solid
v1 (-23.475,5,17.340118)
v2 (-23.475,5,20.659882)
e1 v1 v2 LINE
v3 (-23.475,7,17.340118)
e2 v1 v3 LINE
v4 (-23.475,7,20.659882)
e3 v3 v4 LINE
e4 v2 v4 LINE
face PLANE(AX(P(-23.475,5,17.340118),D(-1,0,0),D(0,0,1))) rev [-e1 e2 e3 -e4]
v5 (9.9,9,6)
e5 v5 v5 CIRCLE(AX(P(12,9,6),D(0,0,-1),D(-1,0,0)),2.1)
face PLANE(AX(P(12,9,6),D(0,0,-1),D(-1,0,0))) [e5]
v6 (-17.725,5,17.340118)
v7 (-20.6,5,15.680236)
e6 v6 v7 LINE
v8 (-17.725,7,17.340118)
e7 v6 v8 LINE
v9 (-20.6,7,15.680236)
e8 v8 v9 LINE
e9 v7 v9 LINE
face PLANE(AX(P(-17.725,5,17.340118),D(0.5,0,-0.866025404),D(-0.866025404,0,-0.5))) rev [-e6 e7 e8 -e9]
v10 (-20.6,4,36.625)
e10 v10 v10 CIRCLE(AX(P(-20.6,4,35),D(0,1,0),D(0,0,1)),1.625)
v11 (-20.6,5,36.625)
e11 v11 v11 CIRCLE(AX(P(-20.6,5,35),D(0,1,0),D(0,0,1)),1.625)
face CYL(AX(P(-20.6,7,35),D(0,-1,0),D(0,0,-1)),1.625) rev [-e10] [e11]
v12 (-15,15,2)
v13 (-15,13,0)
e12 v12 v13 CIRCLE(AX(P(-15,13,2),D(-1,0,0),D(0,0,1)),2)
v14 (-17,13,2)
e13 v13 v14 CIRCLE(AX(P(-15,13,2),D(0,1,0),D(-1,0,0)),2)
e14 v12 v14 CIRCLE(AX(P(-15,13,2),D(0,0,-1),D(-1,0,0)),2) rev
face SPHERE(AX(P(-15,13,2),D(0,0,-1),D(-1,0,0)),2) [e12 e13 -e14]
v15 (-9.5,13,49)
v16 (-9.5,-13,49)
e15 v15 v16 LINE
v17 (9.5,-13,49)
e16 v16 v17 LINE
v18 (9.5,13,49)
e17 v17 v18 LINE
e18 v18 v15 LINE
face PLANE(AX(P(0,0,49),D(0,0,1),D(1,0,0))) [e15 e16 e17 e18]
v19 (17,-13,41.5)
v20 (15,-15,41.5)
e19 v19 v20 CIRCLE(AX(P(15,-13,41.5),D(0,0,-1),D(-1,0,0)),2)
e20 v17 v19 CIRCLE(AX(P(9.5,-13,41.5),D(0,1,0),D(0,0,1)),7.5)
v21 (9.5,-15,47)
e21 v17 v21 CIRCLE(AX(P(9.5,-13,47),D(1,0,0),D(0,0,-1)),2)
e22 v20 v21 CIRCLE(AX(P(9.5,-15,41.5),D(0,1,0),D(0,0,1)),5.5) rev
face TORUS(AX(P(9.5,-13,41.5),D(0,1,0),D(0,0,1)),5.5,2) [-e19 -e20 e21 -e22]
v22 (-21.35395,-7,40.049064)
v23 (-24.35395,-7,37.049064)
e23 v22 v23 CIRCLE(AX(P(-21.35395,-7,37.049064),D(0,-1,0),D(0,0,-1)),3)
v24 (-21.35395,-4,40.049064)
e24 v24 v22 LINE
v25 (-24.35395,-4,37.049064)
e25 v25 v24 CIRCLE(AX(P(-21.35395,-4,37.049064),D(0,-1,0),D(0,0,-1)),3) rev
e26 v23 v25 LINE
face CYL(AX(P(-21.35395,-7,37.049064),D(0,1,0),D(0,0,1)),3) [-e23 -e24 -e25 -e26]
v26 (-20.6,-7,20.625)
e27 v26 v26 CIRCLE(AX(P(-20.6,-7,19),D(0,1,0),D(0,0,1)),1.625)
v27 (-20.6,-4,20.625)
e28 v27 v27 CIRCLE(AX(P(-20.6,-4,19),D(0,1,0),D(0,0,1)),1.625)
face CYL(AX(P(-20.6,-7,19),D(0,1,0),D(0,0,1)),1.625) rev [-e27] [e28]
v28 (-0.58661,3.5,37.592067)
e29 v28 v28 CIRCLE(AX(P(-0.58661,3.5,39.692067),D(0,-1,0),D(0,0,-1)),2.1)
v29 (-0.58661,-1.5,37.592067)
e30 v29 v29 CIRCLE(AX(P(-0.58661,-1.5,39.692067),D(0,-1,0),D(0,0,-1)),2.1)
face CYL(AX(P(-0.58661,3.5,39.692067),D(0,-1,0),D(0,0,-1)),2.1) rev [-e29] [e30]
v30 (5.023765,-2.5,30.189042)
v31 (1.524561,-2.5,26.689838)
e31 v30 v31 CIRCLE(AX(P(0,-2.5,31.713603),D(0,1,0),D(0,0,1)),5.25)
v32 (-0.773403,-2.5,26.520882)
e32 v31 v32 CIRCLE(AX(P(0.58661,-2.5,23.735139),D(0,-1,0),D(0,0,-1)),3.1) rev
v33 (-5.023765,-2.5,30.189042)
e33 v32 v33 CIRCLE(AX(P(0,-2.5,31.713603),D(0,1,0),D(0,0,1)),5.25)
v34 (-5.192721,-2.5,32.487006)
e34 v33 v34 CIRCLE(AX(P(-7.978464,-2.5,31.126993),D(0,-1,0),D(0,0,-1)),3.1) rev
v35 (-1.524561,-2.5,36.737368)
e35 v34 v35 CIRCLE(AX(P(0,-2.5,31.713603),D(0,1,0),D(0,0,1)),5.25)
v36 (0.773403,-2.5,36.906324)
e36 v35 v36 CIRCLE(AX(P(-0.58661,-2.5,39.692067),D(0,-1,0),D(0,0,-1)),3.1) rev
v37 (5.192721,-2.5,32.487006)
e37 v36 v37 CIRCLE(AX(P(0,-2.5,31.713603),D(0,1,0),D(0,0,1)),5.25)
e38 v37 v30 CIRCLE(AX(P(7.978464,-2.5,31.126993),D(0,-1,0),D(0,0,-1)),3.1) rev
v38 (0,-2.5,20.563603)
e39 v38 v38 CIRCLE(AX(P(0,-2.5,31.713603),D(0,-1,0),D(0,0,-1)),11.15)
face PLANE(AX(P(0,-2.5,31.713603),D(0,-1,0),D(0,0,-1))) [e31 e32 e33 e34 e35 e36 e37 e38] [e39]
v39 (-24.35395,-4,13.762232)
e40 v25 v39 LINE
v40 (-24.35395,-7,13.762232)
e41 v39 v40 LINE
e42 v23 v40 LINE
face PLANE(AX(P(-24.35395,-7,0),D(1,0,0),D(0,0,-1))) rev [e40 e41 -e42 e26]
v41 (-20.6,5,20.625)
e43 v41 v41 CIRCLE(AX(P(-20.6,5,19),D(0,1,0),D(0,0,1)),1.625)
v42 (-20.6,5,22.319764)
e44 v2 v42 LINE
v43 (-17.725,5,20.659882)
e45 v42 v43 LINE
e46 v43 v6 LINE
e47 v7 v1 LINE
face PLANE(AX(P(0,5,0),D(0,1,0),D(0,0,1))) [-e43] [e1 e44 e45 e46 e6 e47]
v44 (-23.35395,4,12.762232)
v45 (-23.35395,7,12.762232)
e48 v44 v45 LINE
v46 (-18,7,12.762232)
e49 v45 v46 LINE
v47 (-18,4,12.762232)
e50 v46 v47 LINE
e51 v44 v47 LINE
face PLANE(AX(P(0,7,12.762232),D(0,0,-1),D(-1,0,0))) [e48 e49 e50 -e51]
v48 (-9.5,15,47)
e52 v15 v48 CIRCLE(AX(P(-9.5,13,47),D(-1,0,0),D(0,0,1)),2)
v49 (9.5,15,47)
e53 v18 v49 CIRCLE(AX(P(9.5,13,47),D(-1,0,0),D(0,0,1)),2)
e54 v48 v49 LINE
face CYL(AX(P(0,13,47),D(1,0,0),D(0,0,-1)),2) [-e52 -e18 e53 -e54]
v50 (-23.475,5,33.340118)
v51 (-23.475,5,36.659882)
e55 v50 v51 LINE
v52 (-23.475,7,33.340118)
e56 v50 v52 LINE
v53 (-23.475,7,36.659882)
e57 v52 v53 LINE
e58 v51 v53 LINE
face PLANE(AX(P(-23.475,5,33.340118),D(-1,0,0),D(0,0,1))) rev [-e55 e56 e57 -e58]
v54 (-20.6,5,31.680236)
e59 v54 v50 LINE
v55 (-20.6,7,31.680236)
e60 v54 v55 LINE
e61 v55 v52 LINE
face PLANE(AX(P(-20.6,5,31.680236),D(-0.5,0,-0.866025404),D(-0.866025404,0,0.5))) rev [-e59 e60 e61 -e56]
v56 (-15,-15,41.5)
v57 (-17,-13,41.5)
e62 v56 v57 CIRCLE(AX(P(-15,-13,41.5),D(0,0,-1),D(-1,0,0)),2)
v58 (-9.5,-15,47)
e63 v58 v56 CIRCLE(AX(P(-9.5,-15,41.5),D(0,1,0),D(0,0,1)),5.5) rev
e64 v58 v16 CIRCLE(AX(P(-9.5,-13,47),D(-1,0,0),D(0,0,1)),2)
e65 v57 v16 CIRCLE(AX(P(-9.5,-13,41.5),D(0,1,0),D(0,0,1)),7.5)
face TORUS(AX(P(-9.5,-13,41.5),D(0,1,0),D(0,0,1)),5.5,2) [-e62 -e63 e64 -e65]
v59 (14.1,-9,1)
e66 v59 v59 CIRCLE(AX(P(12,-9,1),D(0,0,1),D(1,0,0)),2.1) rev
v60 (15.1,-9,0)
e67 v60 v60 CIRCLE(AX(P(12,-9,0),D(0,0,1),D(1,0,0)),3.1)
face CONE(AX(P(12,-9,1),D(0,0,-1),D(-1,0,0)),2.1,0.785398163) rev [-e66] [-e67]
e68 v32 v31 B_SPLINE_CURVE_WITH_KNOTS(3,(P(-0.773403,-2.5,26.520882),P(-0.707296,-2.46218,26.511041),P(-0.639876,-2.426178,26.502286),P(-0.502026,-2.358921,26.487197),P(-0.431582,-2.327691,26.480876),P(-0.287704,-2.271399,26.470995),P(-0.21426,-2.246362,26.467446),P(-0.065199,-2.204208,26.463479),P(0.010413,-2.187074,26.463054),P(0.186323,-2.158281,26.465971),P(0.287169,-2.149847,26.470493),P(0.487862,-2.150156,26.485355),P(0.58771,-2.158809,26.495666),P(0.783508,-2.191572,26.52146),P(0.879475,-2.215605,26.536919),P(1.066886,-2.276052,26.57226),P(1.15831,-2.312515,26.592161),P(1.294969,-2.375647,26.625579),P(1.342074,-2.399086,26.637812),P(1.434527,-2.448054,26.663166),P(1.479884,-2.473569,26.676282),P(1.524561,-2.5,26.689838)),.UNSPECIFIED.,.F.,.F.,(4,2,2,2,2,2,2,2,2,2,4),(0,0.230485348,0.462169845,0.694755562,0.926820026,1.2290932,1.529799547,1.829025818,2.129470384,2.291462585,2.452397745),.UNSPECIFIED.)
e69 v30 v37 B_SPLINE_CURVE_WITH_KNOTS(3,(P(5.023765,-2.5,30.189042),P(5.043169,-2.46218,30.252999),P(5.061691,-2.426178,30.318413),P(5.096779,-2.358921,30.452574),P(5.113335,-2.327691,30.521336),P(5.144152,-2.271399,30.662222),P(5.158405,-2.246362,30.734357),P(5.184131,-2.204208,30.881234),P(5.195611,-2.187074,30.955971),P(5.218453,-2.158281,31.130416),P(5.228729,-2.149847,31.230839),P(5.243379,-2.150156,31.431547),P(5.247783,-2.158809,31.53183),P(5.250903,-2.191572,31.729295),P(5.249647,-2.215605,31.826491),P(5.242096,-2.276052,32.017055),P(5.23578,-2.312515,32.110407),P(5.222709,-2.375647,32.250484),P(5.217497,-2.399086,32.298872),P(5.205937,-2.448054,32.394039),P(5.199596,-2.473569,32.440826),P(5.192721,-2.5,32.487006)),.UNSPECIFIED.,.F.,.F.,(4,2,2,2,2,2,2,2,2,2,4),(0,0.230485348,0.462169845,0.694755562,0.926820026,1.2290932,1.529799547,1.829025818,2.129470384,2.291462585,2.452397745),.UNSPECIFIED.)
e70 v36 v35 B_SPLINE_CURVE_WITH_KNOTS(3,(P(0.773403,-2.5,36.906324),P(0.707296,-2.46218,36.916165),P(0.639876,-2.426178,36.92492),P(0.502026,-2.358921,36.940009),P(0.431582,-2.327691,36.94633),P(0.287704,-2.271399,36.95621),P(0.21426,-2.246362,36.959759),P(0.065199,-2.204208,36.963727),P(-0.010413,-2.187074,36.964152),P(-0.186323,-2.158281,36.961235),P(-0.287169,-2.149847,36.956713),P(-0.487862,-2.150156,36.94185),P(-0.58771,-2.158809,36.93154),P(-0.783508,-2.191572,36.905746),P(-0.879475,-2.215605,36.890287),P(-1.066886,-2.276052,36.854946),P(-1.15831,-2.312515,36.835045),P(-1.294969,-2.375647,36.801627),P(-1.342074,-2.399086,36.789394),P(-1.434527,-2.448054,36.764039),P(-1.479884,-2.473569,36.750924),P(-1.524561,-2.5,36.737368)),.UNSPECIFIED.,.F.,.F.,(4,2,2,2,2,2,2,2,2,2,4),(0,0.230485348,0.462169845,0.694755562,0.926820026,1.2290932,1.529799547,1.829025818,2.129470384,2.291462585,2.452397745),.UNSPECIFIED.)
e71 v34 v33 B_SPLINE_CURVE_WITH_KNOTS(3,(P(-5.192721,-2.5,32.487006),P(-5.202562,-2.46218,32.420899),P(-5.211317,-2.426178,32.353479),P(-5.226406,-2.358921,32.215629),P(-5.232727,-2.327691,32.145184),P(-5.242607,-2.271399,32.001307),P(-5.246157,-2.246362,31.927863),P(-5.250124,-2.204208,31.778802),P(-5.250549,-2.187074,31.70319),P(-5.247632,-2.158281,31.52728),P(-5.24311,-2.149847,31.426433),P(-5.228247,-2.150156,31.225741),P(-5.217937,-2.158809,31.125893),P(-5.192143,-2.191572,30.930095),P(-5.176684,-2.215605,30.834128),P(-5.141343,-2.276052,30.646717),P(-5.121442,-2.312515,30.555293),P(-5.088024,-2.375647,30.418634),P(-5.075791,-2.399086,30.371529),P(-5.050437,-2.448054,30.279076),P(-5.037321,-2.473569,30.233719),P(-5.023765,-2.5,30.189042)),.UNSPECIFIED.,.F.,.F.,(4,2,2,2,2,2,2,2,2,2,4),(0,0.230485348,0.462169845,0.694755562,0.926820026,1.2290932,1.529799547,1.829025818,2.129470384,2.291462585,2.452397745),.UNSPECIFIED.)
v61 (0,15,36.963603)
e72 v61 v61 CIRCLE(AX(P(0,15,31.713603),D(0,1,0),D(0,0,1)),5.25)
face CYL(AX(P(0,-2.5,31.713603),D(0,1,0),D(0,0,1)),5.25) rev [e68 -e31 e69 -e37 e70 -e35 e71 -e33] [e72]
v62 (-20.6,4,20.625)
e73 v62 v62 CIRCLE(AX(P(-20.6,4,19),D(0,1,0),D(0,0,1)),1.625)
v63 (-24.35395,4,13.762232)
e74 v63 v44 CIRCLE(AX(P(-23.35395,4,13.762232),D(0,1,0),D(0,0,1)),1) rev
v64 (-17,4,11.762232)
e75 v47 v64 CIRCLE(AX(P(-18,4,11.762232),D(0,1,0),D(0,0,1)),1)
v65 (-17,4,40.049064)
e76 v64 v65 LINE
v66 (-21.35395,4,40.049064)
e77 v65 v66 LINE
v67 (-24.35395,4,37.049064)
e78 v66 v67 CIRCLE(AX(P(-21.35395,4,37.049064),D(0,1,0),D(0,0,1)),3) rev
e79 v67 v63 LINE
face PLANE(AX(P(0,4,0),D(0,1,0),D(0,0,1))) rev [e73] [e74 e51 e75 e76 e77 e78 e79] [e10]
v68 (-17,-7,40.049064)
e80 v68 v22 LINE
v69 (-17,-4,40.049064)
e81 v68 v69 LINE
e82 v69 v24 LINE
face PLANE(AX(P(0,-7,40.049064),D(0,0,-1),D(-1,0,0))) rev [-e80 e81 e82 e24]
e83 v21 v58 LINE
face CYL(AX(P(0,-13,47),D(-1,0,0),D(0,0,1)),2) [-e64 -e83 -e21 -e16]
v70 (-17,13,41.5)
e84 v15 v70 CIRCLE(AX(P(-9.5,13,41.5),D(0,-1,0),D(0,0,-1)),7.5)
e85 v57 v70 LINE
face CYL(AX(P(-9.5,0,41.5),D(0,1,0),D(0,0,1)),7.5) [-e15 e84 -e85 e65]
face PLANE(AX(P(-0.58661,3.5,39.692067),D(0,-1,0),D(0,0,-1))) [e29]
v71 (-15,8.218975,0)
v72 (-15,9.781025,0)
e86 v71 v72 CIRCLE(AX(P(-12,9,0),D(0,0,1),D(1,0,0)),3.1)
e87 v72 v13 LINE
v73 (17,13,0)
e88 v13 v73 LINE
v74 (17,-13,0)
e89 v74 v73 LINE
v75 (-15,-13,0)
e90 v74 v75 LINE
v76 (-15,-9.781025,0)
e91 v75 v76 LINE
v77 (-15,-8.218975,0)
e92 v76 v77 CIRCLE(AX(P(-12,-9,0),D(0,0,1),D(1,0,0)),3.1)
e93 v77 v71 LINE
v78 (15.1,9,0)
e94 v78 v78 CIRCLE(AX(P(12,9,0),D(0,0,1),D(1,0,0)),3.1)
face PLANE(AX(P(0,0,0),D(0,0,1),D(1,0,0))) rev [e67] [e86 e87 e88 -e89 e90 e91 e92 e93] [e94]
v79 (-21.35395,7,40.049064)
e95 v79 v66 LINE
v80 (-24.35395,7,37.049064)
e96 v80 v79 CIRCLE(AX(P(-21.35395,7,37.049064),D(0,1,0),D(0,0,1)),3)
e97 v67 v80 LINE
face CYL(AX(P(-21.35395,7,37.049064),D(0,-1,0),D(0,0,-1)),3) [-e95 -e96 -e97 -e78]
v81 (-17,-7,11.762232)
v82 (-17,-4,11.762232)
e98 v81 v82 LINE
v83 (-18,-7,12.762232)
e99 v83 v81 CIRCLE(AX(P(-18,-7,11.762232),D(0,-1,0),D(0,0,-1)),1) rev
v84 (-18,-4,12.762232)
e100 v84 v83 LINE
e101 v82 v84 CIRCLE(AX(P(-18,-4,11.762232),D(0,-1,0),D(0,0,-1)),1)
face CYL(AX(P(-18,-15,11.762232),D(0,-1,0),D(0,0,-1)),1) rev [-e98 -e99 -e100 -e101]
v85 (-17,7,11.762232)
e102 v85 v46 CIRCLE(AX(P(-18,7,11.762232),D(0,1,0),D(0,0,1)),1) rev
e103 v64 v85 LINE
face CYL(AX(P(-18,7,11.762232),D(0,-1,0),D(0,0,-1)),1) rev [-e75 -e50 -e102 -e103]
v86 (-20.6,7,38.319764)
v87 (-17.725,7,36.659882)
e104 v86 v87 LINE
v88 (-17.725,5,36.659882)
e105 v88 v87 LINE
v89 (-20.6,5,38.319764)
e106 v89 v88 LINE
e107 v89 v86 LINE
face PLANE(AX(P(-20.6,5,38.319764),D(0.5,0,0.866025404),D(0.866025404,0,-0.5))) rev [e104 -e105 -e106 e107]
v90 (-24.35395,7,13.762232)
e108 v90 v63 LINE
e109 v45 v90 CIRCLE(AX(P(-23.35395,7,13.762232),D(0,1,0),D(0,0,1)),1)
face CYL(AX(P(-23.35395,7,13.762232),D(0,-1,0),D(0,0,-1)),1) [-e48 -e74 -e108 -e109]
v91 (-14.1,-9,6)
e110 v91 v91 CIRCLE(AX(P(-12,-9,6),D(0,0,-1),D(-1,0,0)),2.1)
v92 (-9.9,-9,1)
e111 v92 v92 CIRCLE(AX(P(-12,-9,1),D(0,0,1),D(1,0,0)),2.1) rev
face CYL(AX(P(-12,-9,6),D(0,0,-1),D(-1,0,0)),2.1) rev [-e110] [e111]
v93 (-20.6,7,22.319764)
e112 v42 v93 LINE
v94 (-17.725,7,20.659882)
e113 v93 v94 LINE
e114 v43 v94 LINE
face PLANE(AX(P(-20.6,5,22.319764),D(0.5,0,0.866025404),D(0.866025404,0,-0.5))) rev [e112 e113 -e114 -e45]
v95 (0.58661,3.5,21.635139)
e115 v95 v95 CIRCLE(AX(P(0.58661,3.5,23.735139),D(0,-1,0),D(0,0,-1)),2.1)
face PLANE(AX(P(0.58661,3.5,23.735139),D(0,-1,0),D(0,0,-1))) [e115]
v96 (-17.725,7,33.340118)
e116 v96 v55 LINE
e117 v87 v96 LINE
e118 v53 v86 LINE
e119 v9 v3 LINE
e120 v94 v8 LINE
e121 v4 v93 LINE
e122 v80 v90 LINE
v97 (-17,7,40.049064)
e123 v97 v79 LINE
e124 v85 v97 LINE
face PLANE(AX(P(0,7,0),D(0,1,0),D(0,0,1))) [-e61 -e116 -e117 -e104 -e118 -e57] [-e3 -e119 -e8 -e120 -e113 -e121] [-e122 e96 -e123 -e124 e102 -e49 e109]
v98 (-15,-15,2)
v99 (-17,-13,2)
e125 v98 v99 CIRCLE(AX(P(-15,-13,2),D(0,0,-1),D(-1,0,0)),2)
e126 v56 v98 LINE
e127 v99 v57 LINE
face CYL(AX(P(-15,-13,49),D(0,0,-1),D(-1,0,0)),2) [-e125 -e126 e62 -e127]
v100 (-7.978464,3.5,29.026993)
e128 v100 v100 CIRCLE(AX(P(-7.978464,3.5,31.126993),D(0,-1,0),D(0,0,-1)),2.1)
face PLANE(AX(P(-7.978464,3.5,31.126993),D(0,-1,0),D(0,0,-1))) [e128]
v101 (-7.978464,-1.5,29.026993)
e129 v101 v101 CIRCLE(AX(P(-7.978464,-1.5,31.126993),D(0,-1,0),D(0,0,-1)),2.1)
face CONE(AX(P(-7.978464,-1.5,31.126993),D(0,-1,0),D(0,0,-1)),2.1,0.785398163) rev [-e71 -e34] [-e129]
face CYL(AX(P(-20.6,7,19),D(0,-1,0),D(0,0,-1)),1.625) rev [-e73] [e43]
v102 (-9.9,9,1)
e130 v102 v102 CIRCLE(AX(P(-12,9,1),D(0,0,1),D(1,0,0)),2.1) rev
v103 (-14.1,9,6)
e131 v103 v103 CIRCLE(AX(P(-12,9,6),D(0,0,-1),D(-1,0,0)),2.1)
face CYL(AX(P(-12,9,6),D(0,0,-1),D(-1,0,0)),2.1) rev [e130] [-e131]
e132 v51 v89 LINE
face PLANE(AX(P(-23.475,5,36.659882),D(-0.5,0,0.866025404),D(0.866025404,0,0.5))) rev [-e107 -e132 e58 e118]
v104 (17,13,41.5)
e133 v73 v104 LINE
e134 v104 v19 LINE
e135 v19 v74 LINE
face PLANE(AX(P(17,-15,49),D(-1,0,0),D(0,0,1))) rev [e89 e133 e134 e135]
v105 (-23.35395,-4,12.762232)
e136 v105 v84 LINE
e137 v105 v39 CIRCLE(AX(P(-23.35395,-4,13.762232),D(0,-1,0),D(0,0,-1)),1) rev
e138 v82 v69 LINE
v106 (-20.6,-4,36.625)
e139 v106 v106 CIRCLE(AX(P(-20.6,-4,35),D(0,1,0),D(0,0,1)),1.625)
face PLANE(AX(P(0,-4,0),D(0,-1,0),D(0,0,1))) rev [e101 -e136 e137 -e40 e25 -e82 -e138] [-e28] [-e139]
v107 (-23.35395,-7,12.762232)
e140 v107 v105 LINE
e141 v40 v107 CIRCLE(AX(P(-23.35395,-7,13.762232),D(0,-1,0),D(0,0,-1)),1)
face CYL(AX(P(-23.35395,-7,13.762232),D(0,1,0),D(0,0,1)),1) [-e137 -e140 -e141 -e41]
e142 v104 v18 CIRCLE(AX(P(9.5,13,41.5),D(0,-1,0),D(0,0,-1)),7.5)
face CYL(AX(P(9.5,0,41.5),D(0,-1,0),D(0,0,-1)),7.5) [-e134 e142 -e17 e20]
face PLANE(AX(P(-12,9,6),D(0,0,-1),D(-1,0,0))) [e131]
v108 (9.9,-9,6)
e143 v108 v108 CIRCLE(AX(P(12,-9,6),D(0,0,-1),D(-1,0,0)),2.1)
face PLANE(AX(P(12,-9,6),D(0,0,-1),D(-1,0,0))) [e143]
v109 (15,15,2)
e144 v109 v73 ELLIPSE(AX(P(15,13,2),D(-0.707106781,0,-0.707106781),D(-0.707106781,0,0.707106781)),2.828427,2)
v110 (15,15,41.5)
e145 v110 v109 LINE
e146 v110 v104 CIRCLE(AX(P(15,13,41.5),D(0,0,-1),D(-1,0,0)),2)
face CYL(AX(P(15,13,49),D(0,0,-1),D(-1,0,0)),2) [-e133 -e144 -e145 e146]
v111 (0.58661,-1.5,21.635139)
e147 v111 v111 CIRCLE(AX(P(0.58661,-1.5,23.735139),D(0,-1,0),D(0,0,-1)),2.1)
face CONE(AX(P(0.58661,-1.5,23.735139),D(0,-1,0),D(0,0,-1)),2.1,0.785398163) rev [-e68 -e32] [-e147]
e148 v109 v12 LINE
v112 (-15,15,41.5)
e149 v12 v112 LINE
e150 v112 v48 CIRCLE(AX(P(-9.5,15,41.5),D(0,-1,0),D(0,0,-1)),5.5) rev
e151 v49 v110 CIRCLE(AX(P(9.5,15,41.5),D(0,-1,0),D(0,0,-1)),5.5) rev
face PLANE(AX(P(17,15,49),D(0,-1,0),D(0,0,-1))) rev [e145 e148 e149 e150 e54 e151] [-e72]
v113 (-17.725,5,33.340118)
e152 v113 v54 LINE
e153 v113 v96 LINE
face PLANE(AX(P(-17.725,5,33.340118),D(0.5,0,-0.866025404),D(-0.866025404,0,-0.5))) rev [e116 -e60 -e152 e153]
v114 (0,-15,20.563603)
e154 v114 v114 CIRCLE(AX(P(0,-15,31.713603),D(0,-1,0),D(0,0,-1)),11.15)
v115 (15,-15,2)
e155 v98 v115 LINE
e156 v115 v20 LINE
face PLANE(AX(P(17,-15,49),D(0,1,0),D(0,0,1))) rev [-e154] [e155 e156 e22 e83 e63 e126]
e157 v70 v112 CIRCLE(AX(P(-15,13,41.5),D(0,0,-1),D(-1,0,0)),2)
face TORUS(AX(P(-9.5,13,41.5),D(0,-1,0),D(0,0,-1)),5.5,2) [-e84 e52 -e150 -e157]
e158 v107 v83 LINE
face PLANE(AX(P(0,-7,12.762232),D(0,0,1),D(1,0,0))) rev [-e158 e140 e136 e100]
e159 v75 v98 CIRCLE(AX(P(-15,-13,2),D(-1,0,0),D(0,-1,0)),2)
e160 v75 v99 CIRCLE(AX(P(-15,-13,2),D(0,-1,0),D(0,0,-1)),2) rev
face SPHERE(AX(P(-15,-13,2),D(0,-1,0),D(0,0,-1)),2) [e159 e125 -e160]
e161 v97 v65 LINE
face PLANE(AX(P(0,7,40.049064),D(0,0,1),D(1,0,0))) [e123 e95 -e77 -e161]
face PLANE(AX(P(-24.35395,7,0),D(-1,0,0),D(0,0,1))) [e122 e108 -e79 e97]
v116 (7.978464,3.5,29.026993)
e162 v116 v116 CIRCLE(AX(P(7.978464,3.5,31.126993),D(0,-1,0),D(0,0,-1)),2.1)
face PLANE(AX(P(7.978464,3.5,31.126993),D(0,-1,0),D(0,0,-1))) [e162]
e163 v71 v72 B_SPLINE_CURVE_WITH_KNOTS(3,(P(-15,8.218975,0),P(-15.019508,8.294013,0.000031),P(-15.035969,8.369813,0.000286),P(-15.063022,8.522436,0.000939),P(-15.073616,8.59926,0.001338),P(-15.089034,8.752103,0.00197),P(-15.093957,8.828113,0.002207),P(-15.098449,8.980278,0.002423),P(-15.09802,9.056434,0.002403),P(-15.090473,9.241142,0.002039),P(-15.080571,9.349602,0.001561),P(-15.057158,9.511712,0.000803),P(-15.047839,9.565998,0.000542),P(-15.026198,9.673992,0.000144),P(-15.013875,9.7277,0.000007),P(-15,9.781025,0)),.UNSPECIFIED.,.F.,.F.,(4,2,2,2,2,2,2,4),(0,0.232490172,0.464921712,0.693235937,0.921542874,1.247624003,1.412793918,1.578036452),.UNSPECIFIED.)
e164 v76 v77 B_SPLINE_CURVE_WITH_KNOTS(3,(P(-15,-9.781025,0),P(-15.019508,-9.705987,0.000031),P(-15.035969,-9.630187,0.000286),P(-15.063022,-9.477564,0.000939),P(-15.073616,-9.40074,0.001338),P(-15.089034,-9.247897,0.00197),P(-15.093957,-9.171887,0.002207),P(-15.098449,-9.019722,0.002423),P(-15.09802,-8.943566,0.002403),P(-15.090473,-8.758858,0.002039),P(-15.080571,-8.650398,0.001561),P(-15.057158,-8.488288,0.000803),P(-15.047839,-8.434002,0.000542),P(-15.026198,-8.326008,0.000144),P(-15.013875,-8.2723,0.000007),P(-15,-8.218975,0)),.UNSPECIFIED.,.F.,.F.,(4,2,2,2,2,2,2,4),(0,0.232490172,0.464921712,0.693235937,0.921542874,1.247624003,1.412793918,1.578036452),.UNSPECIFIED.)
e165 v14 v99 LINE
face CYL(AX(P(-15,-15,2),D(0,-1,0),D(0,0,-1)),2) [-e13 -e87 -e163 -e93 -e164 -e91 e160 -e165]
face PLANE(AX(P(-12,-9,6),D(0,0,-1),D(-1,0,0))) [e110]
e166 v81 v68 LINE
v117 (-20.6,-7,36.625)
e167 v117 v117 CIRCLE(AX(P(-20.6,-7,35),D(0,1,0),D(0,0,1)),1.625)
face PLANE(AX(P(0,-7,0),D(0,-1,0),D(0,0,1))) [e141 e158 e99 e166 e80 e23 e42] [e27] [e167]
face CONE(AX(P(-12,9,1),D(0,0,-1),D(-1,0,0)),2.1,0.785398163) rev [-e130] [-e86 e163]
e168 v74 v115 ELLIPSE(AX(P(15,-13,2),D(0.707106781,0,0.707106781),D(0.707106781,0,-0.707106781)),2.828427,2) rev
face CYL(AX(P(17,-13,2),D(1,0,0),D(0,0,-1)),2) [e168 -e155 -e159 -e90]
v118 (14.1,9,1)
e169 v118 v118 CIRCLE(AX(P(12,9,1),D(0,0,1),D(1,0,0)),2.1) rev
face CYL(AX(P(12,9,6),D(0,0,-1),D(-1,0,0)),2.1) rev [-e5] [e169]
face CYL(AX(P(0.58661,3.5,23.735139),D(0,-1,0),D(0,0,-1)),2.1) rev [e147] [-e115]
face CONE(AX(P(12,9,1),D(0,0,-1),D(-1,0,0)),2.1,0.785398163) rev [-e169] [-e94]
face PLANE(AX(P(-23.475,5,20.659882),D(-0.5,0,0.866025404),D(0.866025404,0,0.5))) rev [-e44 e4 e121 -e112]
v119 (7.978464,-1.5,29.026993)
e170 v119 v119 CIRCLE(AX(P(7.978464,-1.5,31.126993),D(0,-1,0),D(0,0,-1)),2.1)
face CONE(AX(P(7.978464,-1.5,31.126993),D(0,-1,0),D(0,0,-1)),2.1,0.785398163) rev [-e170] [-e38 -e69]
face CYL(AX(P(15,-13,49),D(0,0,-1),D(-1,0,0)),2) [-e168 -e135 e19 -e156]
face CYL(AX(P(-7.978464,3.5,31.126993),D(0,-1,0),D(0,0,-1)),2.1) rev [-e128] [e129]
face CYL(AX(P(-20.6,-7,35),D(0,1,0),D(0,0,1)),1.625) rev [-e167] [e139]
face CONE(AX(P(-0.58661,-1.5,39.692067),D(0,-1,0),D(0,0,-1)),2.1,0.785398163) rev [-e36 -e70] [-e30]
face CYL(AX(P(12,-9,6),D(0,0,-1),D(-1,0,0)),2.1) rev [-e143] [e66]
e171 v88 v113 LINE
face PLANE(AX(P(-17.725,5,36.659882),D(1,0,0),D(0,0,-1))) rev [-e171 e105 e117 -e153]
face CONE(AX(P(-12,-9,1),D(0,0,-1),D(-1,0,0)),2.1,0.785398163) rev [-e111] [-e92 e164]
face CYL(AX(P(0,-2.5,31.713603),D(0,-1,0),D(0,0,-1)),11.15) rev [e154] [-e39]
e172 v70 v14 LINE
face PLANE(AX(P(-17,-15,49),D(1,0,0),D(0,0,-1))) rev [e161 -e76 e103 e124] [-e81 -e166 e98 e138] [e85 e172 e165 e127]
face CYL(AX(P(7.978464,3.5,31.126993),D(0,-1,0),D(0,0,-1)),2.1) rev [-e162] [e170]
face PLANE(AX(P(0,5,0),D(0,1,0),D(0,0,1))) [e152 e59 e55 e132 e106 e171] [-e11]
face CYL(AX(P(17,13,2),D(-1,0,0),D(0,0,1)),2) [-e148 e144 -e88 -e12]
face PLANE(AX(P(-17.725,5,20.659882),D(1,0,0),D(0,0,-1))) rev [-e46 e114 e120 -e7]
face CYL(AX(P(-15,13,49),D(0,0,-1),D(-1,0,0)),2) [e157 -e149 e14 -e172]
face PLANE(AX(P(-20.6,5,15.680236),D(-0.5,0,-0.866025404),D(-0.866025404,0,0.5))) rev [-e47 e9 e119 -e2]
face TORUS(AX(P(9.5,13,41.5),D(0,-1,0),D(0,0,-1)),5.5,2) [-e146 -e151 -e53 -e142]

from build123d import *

# Parameters (mm, degrees)
SKETCH1_W           = 34
SKETCH1_H           = 30
BOSS_EXTRUDE1_DEPTH = 49
SKETCH2_R           = 2.1
CUT_EXTRUDE1_DEPTH  = 6
SKETCH5_R           = 11.15
CUT_EXTRUDE2_DEPTH  = 12.5
SKETCH6_R           = 5.25
CUT_EXTRUDE3_DEPTH  = 17.5
SKETCH7_R           = 2.1
CUT_EXTRUDE4_DEPTH  = 6
CHAMFER1_SIZE       = 1
CHAMFER2_SIZE       = 1
FILLET1_R           = 7.5
FILLET2_R           = 2
BOSS_EXTRUDE2_START = 4
SKETCH9_W           = 7.353949633
SKETCH9_H           = 27.286831646
SKETCH9_R           = 1.625
BOSS_EXTRUDE2_DEPTH = 3
FILLET3_R           = 3
FILLET4_R           = 1
CUT_EXTRUDE6_DEPTH  = 2


with BuildPart() as part:
    # Sketch1 → Boss-Extrude1 (new body)
    with BuildSketch(Plane.XY):
        Rectangle(SKETCH1_W, SKETCH1_H)
    extrude(amount=BOSS_EXTRUDE1_DEPTH)

    # Sketch2 → Cut-Extrude1 (cut)
    with BuildSketch(Plane(origin=(0, 0, 0), x_dir=(-1, 0, 0), z_dir=(0, 0, -1))):
        with Locations((12, -9)):
            Circle(SKETCH2_R)
        with Locations((12, 9)):
            Circle(SKETCH2_R)
        with Locations((-12, -9)):
            Circle(SKETCH2_R)
        with Locations((-12, 9)):
            Circle(SKETCH2_R)
    extrude(amount=-CUT_EXTRUDE1_DEPTH, mode=Mode.SUBTRACT)

    # Sketch5 → Cut-Extrude2 (cut)
    with BuildSketch(Plane.XZ.offset(15)):
        with Locations(Location((0, 31.713602896, 0), (0, 0, 270))):
            Circle(SKETCH5_R)
    extrude(amount=-CUT_EXTRUDE2_DEPTH, mode=Mode.SUBTRACT)

    # Sketch6 → Cut-Extrude3 (cut)
    with BuildSketch(Plane(origin=(0, 15, 0), x_dir=(1, 0, 0), z_dir=(0, 1, 0))):
        with Locations(Location((0, -31.713602896, 0), (0, 0, 270))):
            Circle(SKETCH6_R)
    extrude(amount=-CUT_EXTRUDE3_DEPTH, mode=Mode.SUBTRACT)

    # Sketch7 → Cut-Extrude4 (cut)
    with BuildSketch(Plane.XZ.offset(2.5)):
        with Locations(Location((-7.978464084, 31.126993267, 0), (0, 0, 270))):
            Circle(SKETCH7_R)
        with Locations(Location((-0.586609629, 39.692066981, 0), (0, 0, 270))):
            Circle(SKETCH7_R)
        with Locations(Location((7.978464084, 31.126993267, 0), (0, 0, 270))):
            Circle(SKETCH7_R)
        with Locations(Location((0.586609629, 23.735138812, 0), (0, 0, 270))):
            Circle(SKETCH7_R)
    extrude(amount=-CUT_EXTRUDE4_DEPTH, mode=Mode.SUBTRACT)

    # Chamfer1
    # the kernel refuses this chamfer: 1 mm, written as the material it takes off along each edge
    with BuildSketch(Plane(origin=(-7.978464084, -2.5, 31.126993267), x_dir=(0, 0, -1), z_dir=(-1, 0, 0))) as chamfer1_piece_1:
        Polygon((2.1 + CHAMFER1_SIZE, 0), (2.1, -CHAMFER1_SIZE), (2.1, 0), align=None)
    revolve(axis=Axis((-7.978464084, -2.5, 31.126993267), (0, -1, 0)), mode=Mode.SUBTRACT)
    with BuildSketch(Plane(origin=(-0.586609629, -2.5, 39.692066981), x_dir=(0, 0, -1), z_dir=(-1, 0, 0))) as chamfer1_piece_2:
        Polygon((2.1 + CHAMFER1_SIZE, 0), (2.1, -CHAMFER1_SIZE), (2.1, 0), align=None)
    revolve(axis=Axis((-0.586609629, -2.5, 39.692066981), (0, -1, 0)), mode=Mode.SUBTRACT)
    with BuildSketch(Plane(origin=(7.978464084, -2.5, 31.126993267), x_dir=(0, 0, -1), z_dir=(-1, 0, 0))) as chamfer1_piece_3:
        Polygon((2.1 + CHAMFER1_SIZE, 0), (2.1, -CHAMFER1_SIZE), (2.1, 0), align=None)
    revolve(axis=Axis((7.978464084, -2.5, 31.126993267), (0, -1, 0)), mode=Mode.SUBTRACT)
    with BuildSketch(Plane(origin=(0.586609629, -2.5, 23.735138812), x_dir=(0, 0, -1), z_dir=(-1, 0, 0))) as chamfer1_piece_4:
        Polygon((2.1 + CHAMFER1_SIZE, 0), (2.1, -CHAMFER1_SIZE), (2.1, 0), align=None)
    revolve(axis=Axis((0.586609629, -2.5, 23.735138812), (0, -1, 0)), mode=Mode.SUBTRACT)

    # Chamfer2
    chamfer2_edges = [part.edges().sort_by_distance(p)[0] for p in [
        (-9.9, 9, 0),
        (14.1, -9, 0),
        (14.1, 9, 0),
        (-9.9, -9, 0),
    ]]
    chamfer(chamfer2_edges, length=CHAMFER2_SIZE)

    # Fillet1
    fillet1_edges = [part.edges().sort_by_distance(p)[0] for p in [
        (-17, 0, 49),
        (17, 0, 49),
    ]]
    fillet(fillet1_edges, radius=FILLET1_R)

    # Fillet2
    # the kernel refuses this fillet: 2 mm, written as the material it takes off along each edge
    with BuildSketch(Plane(origin=(-15, -13, 2), x_dir=(0, 0, -1), z_dir=(0, -1, 0))) as fillet2_piece_1_section:
        Polygon((0, 0), (FILLET2_R, 0), (FILLET2_R, -FILLET2_R), (0, -FILLET2_R), align=None)
    fillet2_piece_1 = extrude(amount=FILLET2_R, mode=Mode.PRIVATE)
    fillet2_piece_1 = fillet2_piece_1 - Plane(origin=(-15, -13, 2), x_dir=(0.7071067811865475, 0, 0.7071067811865475), z_dir=(0, -1, 0)) * Sphere(FILLET2_R, mode=Mode.PRIVATE)
    add(fillet2_piece_1, mode=Mode.SUBTRACT)
    with BuildSketch(Plane(origin=(-15, 13, 2), x_dir=(0, 0, -1), z_dir=(0, 1, 0))) as fillet2_piece_2_section:
        Polygon((0, 0), (FILLET2_R, 0), (FILLET2_R, FILLET2_R), (0, FILLET2_R), align=None)
    fillet2_piece_2 = extrude(amount=FILLET2_R, mode=Mode.PRIVATE)
    fillet2_piece_2 = fillet2_piece_2 - Plane(origin=(-15, 13, 2), x_dir=(0.7071067811865475, 0, 0.7071067811865475), z_dir=(0, 1, 0)) * Sphere(FILLET2_R, mode=Mode.PRIVATE)
    add(fillet2_piece_2, mode=Mode.SUBTRACT)
    with BuildSketch(Plane(origin=(9.5, 15, 41.5), x_dir=(1, 0, 0), z_dir=(0, 0, -1))) as fillet2_piece_3:
        with BuildLine():
            CenterArc((7.5 - FILLET2_R, FILLET2_R), FILLET2_R, 270, 90)
            Line((7.5 - FILLET2_R, 0), (7.5, 0))
            Line((7.5, 0), (7.5, FILLET2_R))
        make_face()
    revolve(axis=Axis((9.5, 15, 41.5), (0, -1, 0)), revolution_arc=90, mode=Mode.SUBTRACT)
    with BuildSketch(Plane(origin=(17, -15, -5), x_dir=(-1, 0, 0), z_dir=(0, 0, 1)), Plane(origin=(17, 15, -5), x_dir=(0, -1, 0), z_dir=(0, 0, 1))) as fillet2_piece_4:
        with BuildLine():
            CenterArc((FILLET2_R, -FILLET2_R), FILLET2_R, 90, 90)
            Line((0, -FILLET2_R), (0, 0))
            Line((0, 0), (FILLET2_R, 0))
        make_face()
    extrude(amount=46.5, mode=Mode.SUBTRACT)
    with BuildSketch(Plane(origin=(-17, -15, 2), x_dir=(1, 0, 0), z_dir=(0, 0, 1)), Plane(origin=(-17, 15, 2), x_dir=(0, -1, 0), z_dir=(0, 0, 1))) as fillet2_piece_5:
        with BuildLine():
            CenterArc((FILLET2_R, FILLET2_R), FILLET2_R, 180, 90)
            Line((0, FILLET2_R), (0, 0))
            Line((0, 0), (FILLET2_R, 0))
        make_face()
    extrude(amount=39.5, mode=Mode.SUBTRACT)
    with BuildSketch(Plane(origin=(-9.5, -15, 41.5), x_dir=(-1, 0, 0), z_dir=(0, 0, -1))) as fillet2_piece_6:
        with BuildLine():
            CenterArc((7.5 - FILLET2_R, FILLET2_R), FILLET2_R, 270, 90)
            Line((7.5, FILLET2_R), (7.5, 0))
            Line((7.5, 0), (7.5 - FILLET2_R, 0))
        make_face()
    revolve(axis=Axis((-9.5, -15, 41.5), (0, 1, 0)), revolution_arc=90, mode=Mode.SUBTRACT)
    with BuildSketch(Plane(origin=(9.5, -15, 41.5), x_dir=(1, 0, 0), z_dir=(0, 0, -1))) as fillet2_piece_7:
        with BuildLine():
            CenterArc((7.5 - FILLET2_R, -FILLET2_R), FILLET2_R, 0, 90)
            Line((7.5, -FILLET2_R), (7.5, 0))
            Line((7.5, 0), (7.5 - FILLET2_R, 0))
        make_face()
    revolve(axis=Axis((9.5, -15, 41.5), (0, -1, 0)), revolution_arc=90, mode=Mode.SUBTRACT)
    with BuildSketch(Plane(origin=(22, -15, 0), x_dir=(0, 0, 1), z_dir=(-1, 0, 0))) as fillet2_piece_8:
        with BuildLine():
            CenterArc((FILLET2_R, FILLET2_R), FILLET2_R, 180, 90)
            Line((0, FILLET2_R), (0, 0))
            Line((0, 0), (FILLET2_R, 0))
        make_face()
    extrude(amount=37, mode=Mode.SUBTRACT)
    with BuildSketch(Plane(origin=(-17, -13, 0), x_dir=(1, 0, 0), z_dir=(0, 1, 0))) as fillet2_piece_9:
        with BuildLine():
            CenterArc((FILLET2_R, -FILLET2_R), FILLET2_R, 90, 90)
            Line((0, -FILLET2_R), (0, 0))
            Line((0, 0), (FILLET2_R, 0))
        make_face()
    extrude(amount=26, mode=Mode.SUBTRACT)
    with BuildSketch(Plane(origin=(-15, 15, 0), x_dir=(0, -1, 0), z_dir=(1, 0, 0))) as fillet2_piece_10:
        with BuildLine():
            CenterArc((FILLET2_R, -FILLET2_R), FILLET2_R, 90, 90)
            Line((0, -FILLET2_R), (0, 0))
            Line((0, 0), (FILLET2_R, 0))
        make_face()
    extrude(amount=37, mode=Mode.SUBTRACT)
    with BuildSketch(Plane(origin=(-9.5, 15, 49), x_dir=(0, -1, 0), z_dir=(1, 0, 0))) as fillet2_piece_11:
        with BuildLine():
            CenterArc((FILLET2_R, FILLET2_R), FILLET2_R, 180, 90)
            Line((0, FILLET2_R), (0, 0))
            Line((0, 0), (FILLET2_R, 0))
        make_face()
    extrude(amount=19, mode=Mode.SUBTRACT)
    with BuildSketch(Plane(origin=(9.5, -15, 49), x_dir=(0, 0, -1), z_dir=(-1, 0, 0))) as fillet2_piece_12:
        with BuildLine():
            CenterArc((FILLET2_R, -FILLET2_R), FILLET2_R, 90, 90)
            Line((0, -FILLET2_R), (0, 0))
            Line((0, 0), (FILLET2_R, 0))
        make_face()
    extrude(amount=19, mode=Mode.SUBTRACT)
    with BuildSketch(Plane(origin=(-9.5, 15, 41.5), x_dir=(-1, 0, 0), z_dir=(0, 0, -1))) as fillet2_piece_13:
        with BuildLine():
            CenterArc((7.5 - FILLET2_R, -FILLET2_R), FILLET2_R, 0, 90)
            Line((7.5 - FILLET2_R, 0), (7.5, 0))
            Line((7.5, 0), (7.5, -FILLET2_R))
        make_face()
    revolve(axis=Axis((-9.5, 15, 41.5), (0, 1, 0)), revolution_arc=90, mode=Mode.SUBTRACT)

    # Sketch9 → Boss-Extrude2 (add)
    with BuildSketch(Plane(origin=(0, 0, 0), x_dir=(1, 0, 0), z_dir=(0, 1, 0)).offset(BOSS_EXTRUDE2_START)):
        with Locations((-20.676974816, -26.405648135)):
            Rectangle(SKETCH9_W, SKETCH9_H)
        with Locations(Location((-20.6, -35, 0), (0, 0, 270))):
            Circle(SKETCH9_R, mode=Mode.SUBTRACT)
        with Locations(Location((-20.6, -19, 0), (0, 0, 270))):
            Circle(SKETCH9_R, mode=Mode.SUBTRACT)
    boss_extrude2 = extrude(amount=BOSS_EXTRUDE2_DEPTH)

    # Mirror1: Boss-Extrude2 across plane
    add(boss_extrude2.mirror(Plane.ZX))

    # Fillet3
    fillet3_edges = [part.edges().sort_by_distance(p)[0] for p in [
        (-24.353949633, 5.5, 40.049063958),
        (-24.353949633, -5.5, 40.049063958),
    ]]
    fillet(fillet3_edges, radius=FILLET3_R)

    # Fillet4
    fillet4_edges = [part.edges().sort_by_distance(p)[0] for p in [
        (-17, 5.5, 12.762232312),
        (-24.353949633, 5.5, 12.762232312),
        (-17, -5.5, 12.762232312),
        (-24.353949633, -5.5, 12.762232312),
    ]]
    fillet(fillet4_edges, radius=FILLET4_R)

    # Sketch10 → Cut-Extrude6 (cut)
    with BuildSketch(Plane(origin=(0, 7, 0), x_dir=(1, 0, 0), z_dir=(0, 1, 0))):
        Polygon((-17.725, -20.659882024), (-17.725, -17.340117976), (-20.6, -15.680235952), (-23.475, -17.340117976), (-23.475, -20.659882024), (-20.6, -22.319764048), align=None)
        Polygon((-17.725, -36.659882024), (-17.725, -33.340117976), (-20.6, -31.680235952), (-23.475, -33.340117976), (-23.475, -36.659882024), (-20.6, -38.319764048), align=None)
    extrude(amount=-CUT_EXTRUDE6_DEPTH, mode=Mode.SUBTRACT)


solid = part.part
